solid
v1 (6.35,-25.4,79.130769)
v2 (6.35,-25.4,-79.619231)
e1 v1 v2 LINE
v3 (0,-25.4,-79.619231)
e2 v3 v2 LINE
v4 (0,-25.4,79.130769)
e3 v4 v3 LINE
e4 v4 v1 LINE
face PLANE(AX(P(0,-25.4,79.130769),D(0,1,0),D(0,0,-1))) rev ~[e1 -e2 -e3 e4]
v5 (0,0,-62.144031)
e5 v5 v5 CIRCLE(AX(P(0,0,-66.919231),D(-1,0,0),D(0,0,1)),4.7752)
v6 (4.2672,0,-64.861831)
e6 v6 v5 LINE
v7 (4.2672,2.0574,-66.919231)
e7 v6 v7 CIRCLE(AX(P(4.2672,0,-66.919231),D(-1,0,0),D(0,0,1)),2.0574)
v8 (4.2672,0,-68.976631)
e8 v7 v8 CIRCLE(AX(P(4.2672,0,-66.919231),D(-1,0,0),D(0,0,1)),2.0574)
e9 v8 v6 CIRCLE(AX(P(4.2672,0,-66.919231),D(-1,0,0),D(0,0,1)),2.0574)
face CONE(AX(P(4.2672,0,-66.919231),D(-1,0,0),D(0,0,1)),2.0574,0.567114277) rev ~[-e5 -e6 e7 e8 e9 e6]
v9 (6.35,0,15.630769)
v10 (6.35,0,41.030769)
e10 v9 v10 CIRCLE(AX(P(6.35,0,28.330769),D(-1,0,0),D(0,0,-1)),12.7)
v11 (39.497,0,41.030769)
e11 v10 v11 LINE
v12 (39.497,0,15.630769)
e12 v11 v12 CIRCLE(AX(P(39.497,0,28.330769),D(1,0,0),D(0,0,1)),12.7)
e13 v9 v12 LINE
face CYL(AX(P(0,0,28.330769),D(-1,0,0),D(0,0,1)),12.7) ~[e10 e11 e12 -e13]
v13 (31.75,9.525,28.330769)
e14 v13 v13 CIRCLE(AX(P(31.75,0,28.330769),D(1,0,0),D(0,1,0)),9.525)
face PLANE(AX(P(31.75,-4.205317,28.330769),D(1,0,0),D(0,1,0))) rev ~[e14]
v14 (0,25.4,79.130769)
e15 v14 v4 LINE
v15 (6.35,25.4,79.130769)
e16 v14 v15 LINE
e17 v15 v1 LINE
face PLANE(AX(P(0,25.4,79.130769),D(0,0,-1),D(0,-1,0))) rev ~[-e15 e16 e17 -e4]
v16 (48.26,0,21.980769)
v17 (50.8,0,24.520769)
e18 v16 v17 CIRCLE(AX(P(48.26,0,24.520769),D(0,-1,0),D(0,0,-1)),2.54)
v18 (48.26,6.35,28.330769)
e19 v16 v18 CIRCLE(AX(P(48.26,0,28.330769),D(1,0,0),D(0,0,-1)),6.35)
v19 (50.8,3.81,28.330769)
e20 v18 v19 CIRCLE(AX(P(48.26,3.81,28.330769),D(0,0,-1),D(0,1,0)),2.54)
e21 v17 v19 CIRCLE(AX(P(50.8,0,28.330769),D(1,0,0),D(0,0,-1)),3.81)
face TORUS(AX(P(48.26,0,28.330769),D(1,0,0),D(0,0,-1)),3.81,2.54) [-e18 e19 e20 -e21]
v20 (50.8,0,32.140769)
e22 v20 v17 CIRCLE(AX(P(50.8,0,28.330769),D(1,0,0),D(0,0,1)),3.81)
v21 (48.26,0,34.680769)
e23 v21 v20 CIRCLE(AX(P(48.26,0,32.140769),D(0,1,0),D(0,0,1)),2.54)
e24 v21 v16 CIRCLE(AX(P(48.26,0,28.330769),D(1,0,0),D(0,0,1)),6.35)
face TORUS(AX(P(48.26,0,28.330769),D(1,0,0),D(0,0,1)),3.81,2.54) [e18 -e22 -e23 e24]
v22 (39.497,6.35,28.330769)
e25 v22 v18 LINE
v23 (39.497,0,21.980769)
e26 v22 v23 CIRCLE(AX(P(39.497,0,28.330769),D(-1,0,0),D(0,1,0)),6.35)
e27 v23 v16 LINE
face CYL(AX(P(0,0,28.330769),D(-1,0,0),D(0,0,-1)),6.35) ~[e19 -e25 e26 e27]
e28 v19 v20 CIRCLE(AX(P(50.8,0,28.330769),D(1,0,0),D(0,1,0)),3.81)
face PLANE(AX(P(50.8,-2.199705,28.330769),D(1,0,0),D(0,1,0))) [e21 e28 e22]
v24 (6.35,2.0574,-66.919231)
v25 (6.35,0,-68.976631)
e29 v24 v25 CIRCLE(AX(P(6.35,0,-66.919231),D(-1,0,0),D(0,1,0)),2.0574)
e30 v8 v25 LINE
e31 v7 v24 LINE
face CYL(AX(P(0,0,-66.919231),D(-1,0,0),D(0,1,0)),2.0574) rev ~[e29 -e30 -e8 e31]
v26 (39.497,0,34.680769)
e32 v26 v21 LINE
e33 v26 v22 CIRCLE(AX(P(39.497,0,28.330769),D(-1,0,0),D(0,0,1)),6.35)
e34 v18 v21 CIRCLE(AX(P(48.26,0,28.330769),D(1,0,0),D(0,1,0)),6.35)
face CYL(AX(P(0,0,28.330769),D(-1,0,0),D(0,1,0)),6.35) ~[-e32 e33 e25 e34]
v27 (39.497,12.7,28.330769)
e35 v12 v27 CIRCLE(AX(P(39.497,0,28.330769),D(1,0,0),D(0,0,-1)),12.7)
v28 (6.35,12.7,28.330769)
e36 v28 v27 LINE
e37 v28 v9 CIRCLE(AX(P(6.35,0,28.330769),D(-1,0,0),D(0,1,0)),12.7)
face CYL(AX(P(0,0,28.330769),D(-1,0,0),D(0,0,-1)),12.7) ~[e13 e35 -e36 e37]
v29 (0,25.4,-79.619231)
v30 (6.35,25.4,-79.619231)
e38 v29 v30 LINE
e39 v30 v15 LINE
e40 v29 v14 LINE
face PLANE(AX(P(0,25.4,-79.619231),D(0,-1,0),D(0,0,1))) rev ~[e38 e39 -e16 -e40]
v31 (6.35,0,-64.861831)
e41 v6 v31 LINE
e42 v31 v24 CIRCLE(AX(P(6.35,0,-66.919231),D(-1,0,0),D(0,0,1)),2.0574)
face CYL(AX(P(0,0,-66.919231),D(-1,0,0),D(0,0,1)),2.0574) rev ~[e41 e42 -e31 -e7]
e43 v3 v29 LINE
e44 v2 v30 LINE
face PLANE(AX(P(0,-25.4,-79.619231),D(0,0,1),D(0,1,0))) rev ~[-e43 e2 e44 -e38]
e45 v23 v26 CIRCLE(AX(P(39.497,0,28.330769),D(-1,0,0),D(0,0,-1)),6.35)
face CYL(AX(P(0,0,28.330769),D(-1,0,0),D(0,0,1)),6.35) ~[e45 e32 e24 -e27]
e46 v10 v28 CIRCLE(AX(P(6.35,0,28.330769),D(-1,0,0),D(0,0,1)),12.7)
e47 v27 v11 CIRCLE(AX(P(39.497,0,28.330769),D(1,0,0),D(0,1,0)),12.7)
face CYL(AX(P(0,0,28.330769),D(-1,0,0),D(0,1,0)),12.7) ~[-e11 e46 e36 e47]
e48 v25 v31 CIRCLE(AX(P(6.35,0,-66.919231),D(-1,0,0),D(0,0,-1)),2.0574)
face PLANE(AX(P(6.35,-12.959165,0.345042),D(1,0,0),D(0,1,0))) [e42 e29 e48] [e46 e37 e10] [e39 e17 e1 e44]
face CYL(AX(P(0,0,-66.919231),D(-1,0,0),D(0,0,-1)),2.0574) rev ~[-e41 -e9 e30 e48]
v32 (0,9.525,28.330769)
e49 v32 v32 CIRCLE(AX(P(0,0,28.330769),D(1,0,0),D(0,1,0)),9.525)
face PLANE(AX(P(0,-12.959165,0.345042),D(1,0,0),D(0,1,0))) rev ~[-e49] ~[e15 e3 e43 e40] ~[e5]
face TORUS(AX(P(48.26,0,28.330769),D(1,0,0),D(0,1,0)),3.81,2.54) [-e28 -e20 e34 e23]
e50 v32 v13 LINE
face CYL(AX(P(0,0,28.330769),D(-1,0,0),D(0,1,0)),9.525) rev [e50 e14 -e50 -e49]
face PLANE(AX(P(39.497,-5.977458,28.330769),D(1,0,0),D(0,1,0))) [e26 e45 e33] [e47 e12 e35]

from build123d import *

# Parameters (mm, degrees)
F1_DEPTH = 6.35
F2_DEPTH = 39.497
F3_DEPTH = 50.8
F4_R     = 2.54
F6_DEPTH = 31.75


# Not quite as in the source:
# - a fillet or chamfer that OpenCascade refuses, or shapes differently, is made with other operations: its cross-section is extruded or revolved along the edge and cut away or added


with BuildPart() as f1:
    # F0 (on Right) → F1 (new body)
    with BuildSketch(Plane.YZ):
        with BuildLine():
            Line((0, 79.1307692308), (-25.4, 79.1307692308))
            Line((-25.4, 79.1307692308), (-25.4, -79.6192307692))
            Line((-25.4, -79.6192307692), (0, -79.6192307692))
            Line((0, -79.6192307692), (0, -68.9766307692))
            ThreePointArc((0, -68.9766307692), (-2.0574, -66.9192307692), (0, -64.8618307692))
            Line((0, -64.8618307692), (0, -54.2192307692))
            Line((0, -54.2192307692), (0, -41.5192307692))
            Line((0, -41.5192307692), (0, 15.6307692308))
            ThreePointArc((0, 15.6307692308), (-12.7, 28.3307692308), (0, 41.0307692308))
            Line((0, 41.0307692308), (0, 79.1307692308))
        make_face()
        with BuildLine():
            Line((25.4, 79.1307692308), (0, 79.1307692308))
            Line((0, 79.1307692308), (0, 41.0307692308))
            ThreePointArc((0, 41.0307692308), (8.9802561211, 37.3110253518), (12.7, 28.3307692308))
            ThreePointArc((12.7, 28.3307692308), (8.9802561211, 19.3505131097), (0, 15.6307692308))
            Line((0, 15.6307692308), (0, -41.5192307692))
            Line((0, -41.5192307692), (0, -54.2192307692))
            Line((0, -54.2192307692), (0, -64.8618307692))
            ThreePointArc((0, -64.8618307692), (1.4548014916, -65.4644292776), (2.0574, -66.9192307692))
            ThreePointArc((2.0574, -66.9192307692), (1.4548014916, -68.3740322608), (0, -68.9766307692))
            Line((0, -68.9766307692), (0, -79.6192307692))
            Line((0, -79.6192307692), (25.4, -79.6192307692))
            Line((25.4, -79.6192307692), (25.4, 79.1307692308))
        make_face()
    extrude(amount=F1_DEPTH)

    # F0 (on Right) → F2 (join)
    with BuildSketch(Plane.YZ):
        with BuildLine():
            Line((0, 37.8557692308), (0, 41.0307692308))
            ThreePointArc((0, 41.0307692308), (-12.7, 28.3307692308), (0, 15.6307692308))
            Line((0, 15.6307692308), (0, 18.8057692308))
            ThreePointArc((0, 18.8057692308), (-9.525, 28.3307692308), (0, 37.8557692308))
        make_face()
        with BuildLine():
            ThreePointArc((12.7, 28.3307692308), (8.9802561211, 37.3110253518), (0, 41.0307692308))
            Line((0, 41.0307692308), (0, 37.8557692308))
            ThreePointArc((0, 37.8557692308), (6.7351920908, 35.0659613216), (9.525, 28.3307692308))
            ThreePointArc((9.525, 28.3307692308), (6.7351920908, 21.59557714), (0, 18.8057692308))
            Line((0, 18.8057692308), (0, 15.6307692308))
            ThreePointArc((0, 15.6307692308), (8.9802561211, 19.3505131097), (12.7, 28.3307692308))
        make_face()
        with BuildLine():
            Line((0, 34.6807692308), (0, 37.8557692308))
            ThreePointArc((0, 37.8557692308), (-9.525, 28.3307692308), (0, 18.8057692308))
            Line((0, 18.8057692308), (0, 21.9807692308))
            ThreePointArc((0, 21.9807692308), (-6.35, 28.3307692308), (0, 34.6807692308))
        make_face()
        with BuildLine():
            ThreePointArc((9.525, 28.3307692308), (6.7351920908, 35.0659613216), (0, 37.8557692308))
            Line((0, 37.8557692308), (0, 34.6807692308))
            ThreePointArc((0, 34.6807692308), (4.4901280605, 32.8208972913), (6.35, 28.3307692308))
            ThreePointArc((6.35, 28.3307692308), (4.4901280605, 23.8406411702), (0, 21.9807692308))
            Line((0, 21.9807692308), (0, 18.8057692308))
            ThreePointArc((0, 18.8057692308), (6.7351920908, 21.59557714), (9.525, 28.3307692308))
        make_face()
    extrude(amount=F2_DEPTH)

    # F0 (on Right) → F3 (join)
    with BuildSketch(Plane.YZ):
        with BuildLine():
            Line((0, 28.3307692308), (0, 34.6807692308))
            ThreePointArc((0, 34.6807692308), (-6.35, 28.3307692308), (0, 21.9807692308))
            Line((0, 21.9807692308), (0, 28.3307692308))
        make_face()
        with BuildLine():
            ThreePointArc((6.35, 28.3307692308), (4.4901280605, 32.8208972913), (0, 34.6807692308))
            Line((0, 34.6807692308), (0, 28.3307692308))
            Line((0, 28.3307692308), (0, 21.9807692308))
            ThreePointArc((0, 21.9807692308), (4.4901280605, 23.8406411702), (6.35, 28.3307692308))
        make_face()
    extrude(amount=F3_DEPTH)

    # F4
    f4_edges = [f1.edges().sort_by_distance(p)[0] for p in [
        (50.8, 0, 34.680769),
    ]]
    fillet(f4_edges, radius=F4_R)

    # F5: chamfer of 2.7178 x 4.2672 on 1 edges, made by hand

    # F5_s1 → F5_t2 (revolve, cut)
    with BuildSketch(Plane.XZ):
        Polygon((4.2672, -64.8618307692), (0, -62.1440307692), (0, -64.8618307692), align=None)
    revolve(axis=Axis((0, 0, -66.9192307692), (-1, 0, 0)), mode=Mode.SUBTRACT)

    # F0 (on Right) → F6 (cut)
    with BuildSketch(Plane.YZ):
        with BuildLine():
            Line((0, 34.6807692308), (0, 37.8557692308))
            ThreePointArc((0, 37.8557692308), (-9.525, 28.3307692308), (0, 18.8057692308))
            Line((0, 18.8057692308), (0, 21.9807692308))
            ThreePointArc((0, 21.9807692308), (-6.35, 28.3307692308), (0, 34.6807692308))
        make_face()
        with BuildLine():
            Line((0, 28.3307692308), (0, 34.6807692308))
            ThreePointArc((0, 34.6807692308), (-6.35, 28.3307692308), (0, 21.9807692308))
            Line((0, 21.9807692308), (0, 28.3307692308))
        make_face()
        with BuildLine():
            ThreePointArc((6.35, 28.3307692308), (4.4901280605, 32.8208972913), (0, 34.6807692308))
            Line((0, 34.6807692308), (0, 28.3307692308))
            Line((0, 28.3307692308), (0, 21.9807692308))
            ThreePointArc((0, 21.9807692308), (4.4901280605, 23.8406411702), (6.35, 28.3307692308))
        make_face()
        with BuildLine():
            ThreePointArc((9.525, 28.3307692308), (6.7351920908, 35.0659613216), (0, 37.8557692308))
            Line((0, 37.8557692308), (0, 34.6807692308))
            ThreePointArc((0, 34.6807692308), (4.4901280605, 32.8208972913), (6.35, 28.3307692308))
            ThreePointArc((6.35, 28.3307692308), (4.4901280605, 23.8406411702), (0, 21.9807692308))
            Line((0, 21.9807692308), (0, 18.8057692308))
            ThreePointArc((0, 18.8057692308), (6.7351920908, 21.59557714), (9.525, 28.3307692308))
        make_face()
    extrude(amount=F6_DEPTH, mode=Mode.SUBTRACT)


solid = f1.part
